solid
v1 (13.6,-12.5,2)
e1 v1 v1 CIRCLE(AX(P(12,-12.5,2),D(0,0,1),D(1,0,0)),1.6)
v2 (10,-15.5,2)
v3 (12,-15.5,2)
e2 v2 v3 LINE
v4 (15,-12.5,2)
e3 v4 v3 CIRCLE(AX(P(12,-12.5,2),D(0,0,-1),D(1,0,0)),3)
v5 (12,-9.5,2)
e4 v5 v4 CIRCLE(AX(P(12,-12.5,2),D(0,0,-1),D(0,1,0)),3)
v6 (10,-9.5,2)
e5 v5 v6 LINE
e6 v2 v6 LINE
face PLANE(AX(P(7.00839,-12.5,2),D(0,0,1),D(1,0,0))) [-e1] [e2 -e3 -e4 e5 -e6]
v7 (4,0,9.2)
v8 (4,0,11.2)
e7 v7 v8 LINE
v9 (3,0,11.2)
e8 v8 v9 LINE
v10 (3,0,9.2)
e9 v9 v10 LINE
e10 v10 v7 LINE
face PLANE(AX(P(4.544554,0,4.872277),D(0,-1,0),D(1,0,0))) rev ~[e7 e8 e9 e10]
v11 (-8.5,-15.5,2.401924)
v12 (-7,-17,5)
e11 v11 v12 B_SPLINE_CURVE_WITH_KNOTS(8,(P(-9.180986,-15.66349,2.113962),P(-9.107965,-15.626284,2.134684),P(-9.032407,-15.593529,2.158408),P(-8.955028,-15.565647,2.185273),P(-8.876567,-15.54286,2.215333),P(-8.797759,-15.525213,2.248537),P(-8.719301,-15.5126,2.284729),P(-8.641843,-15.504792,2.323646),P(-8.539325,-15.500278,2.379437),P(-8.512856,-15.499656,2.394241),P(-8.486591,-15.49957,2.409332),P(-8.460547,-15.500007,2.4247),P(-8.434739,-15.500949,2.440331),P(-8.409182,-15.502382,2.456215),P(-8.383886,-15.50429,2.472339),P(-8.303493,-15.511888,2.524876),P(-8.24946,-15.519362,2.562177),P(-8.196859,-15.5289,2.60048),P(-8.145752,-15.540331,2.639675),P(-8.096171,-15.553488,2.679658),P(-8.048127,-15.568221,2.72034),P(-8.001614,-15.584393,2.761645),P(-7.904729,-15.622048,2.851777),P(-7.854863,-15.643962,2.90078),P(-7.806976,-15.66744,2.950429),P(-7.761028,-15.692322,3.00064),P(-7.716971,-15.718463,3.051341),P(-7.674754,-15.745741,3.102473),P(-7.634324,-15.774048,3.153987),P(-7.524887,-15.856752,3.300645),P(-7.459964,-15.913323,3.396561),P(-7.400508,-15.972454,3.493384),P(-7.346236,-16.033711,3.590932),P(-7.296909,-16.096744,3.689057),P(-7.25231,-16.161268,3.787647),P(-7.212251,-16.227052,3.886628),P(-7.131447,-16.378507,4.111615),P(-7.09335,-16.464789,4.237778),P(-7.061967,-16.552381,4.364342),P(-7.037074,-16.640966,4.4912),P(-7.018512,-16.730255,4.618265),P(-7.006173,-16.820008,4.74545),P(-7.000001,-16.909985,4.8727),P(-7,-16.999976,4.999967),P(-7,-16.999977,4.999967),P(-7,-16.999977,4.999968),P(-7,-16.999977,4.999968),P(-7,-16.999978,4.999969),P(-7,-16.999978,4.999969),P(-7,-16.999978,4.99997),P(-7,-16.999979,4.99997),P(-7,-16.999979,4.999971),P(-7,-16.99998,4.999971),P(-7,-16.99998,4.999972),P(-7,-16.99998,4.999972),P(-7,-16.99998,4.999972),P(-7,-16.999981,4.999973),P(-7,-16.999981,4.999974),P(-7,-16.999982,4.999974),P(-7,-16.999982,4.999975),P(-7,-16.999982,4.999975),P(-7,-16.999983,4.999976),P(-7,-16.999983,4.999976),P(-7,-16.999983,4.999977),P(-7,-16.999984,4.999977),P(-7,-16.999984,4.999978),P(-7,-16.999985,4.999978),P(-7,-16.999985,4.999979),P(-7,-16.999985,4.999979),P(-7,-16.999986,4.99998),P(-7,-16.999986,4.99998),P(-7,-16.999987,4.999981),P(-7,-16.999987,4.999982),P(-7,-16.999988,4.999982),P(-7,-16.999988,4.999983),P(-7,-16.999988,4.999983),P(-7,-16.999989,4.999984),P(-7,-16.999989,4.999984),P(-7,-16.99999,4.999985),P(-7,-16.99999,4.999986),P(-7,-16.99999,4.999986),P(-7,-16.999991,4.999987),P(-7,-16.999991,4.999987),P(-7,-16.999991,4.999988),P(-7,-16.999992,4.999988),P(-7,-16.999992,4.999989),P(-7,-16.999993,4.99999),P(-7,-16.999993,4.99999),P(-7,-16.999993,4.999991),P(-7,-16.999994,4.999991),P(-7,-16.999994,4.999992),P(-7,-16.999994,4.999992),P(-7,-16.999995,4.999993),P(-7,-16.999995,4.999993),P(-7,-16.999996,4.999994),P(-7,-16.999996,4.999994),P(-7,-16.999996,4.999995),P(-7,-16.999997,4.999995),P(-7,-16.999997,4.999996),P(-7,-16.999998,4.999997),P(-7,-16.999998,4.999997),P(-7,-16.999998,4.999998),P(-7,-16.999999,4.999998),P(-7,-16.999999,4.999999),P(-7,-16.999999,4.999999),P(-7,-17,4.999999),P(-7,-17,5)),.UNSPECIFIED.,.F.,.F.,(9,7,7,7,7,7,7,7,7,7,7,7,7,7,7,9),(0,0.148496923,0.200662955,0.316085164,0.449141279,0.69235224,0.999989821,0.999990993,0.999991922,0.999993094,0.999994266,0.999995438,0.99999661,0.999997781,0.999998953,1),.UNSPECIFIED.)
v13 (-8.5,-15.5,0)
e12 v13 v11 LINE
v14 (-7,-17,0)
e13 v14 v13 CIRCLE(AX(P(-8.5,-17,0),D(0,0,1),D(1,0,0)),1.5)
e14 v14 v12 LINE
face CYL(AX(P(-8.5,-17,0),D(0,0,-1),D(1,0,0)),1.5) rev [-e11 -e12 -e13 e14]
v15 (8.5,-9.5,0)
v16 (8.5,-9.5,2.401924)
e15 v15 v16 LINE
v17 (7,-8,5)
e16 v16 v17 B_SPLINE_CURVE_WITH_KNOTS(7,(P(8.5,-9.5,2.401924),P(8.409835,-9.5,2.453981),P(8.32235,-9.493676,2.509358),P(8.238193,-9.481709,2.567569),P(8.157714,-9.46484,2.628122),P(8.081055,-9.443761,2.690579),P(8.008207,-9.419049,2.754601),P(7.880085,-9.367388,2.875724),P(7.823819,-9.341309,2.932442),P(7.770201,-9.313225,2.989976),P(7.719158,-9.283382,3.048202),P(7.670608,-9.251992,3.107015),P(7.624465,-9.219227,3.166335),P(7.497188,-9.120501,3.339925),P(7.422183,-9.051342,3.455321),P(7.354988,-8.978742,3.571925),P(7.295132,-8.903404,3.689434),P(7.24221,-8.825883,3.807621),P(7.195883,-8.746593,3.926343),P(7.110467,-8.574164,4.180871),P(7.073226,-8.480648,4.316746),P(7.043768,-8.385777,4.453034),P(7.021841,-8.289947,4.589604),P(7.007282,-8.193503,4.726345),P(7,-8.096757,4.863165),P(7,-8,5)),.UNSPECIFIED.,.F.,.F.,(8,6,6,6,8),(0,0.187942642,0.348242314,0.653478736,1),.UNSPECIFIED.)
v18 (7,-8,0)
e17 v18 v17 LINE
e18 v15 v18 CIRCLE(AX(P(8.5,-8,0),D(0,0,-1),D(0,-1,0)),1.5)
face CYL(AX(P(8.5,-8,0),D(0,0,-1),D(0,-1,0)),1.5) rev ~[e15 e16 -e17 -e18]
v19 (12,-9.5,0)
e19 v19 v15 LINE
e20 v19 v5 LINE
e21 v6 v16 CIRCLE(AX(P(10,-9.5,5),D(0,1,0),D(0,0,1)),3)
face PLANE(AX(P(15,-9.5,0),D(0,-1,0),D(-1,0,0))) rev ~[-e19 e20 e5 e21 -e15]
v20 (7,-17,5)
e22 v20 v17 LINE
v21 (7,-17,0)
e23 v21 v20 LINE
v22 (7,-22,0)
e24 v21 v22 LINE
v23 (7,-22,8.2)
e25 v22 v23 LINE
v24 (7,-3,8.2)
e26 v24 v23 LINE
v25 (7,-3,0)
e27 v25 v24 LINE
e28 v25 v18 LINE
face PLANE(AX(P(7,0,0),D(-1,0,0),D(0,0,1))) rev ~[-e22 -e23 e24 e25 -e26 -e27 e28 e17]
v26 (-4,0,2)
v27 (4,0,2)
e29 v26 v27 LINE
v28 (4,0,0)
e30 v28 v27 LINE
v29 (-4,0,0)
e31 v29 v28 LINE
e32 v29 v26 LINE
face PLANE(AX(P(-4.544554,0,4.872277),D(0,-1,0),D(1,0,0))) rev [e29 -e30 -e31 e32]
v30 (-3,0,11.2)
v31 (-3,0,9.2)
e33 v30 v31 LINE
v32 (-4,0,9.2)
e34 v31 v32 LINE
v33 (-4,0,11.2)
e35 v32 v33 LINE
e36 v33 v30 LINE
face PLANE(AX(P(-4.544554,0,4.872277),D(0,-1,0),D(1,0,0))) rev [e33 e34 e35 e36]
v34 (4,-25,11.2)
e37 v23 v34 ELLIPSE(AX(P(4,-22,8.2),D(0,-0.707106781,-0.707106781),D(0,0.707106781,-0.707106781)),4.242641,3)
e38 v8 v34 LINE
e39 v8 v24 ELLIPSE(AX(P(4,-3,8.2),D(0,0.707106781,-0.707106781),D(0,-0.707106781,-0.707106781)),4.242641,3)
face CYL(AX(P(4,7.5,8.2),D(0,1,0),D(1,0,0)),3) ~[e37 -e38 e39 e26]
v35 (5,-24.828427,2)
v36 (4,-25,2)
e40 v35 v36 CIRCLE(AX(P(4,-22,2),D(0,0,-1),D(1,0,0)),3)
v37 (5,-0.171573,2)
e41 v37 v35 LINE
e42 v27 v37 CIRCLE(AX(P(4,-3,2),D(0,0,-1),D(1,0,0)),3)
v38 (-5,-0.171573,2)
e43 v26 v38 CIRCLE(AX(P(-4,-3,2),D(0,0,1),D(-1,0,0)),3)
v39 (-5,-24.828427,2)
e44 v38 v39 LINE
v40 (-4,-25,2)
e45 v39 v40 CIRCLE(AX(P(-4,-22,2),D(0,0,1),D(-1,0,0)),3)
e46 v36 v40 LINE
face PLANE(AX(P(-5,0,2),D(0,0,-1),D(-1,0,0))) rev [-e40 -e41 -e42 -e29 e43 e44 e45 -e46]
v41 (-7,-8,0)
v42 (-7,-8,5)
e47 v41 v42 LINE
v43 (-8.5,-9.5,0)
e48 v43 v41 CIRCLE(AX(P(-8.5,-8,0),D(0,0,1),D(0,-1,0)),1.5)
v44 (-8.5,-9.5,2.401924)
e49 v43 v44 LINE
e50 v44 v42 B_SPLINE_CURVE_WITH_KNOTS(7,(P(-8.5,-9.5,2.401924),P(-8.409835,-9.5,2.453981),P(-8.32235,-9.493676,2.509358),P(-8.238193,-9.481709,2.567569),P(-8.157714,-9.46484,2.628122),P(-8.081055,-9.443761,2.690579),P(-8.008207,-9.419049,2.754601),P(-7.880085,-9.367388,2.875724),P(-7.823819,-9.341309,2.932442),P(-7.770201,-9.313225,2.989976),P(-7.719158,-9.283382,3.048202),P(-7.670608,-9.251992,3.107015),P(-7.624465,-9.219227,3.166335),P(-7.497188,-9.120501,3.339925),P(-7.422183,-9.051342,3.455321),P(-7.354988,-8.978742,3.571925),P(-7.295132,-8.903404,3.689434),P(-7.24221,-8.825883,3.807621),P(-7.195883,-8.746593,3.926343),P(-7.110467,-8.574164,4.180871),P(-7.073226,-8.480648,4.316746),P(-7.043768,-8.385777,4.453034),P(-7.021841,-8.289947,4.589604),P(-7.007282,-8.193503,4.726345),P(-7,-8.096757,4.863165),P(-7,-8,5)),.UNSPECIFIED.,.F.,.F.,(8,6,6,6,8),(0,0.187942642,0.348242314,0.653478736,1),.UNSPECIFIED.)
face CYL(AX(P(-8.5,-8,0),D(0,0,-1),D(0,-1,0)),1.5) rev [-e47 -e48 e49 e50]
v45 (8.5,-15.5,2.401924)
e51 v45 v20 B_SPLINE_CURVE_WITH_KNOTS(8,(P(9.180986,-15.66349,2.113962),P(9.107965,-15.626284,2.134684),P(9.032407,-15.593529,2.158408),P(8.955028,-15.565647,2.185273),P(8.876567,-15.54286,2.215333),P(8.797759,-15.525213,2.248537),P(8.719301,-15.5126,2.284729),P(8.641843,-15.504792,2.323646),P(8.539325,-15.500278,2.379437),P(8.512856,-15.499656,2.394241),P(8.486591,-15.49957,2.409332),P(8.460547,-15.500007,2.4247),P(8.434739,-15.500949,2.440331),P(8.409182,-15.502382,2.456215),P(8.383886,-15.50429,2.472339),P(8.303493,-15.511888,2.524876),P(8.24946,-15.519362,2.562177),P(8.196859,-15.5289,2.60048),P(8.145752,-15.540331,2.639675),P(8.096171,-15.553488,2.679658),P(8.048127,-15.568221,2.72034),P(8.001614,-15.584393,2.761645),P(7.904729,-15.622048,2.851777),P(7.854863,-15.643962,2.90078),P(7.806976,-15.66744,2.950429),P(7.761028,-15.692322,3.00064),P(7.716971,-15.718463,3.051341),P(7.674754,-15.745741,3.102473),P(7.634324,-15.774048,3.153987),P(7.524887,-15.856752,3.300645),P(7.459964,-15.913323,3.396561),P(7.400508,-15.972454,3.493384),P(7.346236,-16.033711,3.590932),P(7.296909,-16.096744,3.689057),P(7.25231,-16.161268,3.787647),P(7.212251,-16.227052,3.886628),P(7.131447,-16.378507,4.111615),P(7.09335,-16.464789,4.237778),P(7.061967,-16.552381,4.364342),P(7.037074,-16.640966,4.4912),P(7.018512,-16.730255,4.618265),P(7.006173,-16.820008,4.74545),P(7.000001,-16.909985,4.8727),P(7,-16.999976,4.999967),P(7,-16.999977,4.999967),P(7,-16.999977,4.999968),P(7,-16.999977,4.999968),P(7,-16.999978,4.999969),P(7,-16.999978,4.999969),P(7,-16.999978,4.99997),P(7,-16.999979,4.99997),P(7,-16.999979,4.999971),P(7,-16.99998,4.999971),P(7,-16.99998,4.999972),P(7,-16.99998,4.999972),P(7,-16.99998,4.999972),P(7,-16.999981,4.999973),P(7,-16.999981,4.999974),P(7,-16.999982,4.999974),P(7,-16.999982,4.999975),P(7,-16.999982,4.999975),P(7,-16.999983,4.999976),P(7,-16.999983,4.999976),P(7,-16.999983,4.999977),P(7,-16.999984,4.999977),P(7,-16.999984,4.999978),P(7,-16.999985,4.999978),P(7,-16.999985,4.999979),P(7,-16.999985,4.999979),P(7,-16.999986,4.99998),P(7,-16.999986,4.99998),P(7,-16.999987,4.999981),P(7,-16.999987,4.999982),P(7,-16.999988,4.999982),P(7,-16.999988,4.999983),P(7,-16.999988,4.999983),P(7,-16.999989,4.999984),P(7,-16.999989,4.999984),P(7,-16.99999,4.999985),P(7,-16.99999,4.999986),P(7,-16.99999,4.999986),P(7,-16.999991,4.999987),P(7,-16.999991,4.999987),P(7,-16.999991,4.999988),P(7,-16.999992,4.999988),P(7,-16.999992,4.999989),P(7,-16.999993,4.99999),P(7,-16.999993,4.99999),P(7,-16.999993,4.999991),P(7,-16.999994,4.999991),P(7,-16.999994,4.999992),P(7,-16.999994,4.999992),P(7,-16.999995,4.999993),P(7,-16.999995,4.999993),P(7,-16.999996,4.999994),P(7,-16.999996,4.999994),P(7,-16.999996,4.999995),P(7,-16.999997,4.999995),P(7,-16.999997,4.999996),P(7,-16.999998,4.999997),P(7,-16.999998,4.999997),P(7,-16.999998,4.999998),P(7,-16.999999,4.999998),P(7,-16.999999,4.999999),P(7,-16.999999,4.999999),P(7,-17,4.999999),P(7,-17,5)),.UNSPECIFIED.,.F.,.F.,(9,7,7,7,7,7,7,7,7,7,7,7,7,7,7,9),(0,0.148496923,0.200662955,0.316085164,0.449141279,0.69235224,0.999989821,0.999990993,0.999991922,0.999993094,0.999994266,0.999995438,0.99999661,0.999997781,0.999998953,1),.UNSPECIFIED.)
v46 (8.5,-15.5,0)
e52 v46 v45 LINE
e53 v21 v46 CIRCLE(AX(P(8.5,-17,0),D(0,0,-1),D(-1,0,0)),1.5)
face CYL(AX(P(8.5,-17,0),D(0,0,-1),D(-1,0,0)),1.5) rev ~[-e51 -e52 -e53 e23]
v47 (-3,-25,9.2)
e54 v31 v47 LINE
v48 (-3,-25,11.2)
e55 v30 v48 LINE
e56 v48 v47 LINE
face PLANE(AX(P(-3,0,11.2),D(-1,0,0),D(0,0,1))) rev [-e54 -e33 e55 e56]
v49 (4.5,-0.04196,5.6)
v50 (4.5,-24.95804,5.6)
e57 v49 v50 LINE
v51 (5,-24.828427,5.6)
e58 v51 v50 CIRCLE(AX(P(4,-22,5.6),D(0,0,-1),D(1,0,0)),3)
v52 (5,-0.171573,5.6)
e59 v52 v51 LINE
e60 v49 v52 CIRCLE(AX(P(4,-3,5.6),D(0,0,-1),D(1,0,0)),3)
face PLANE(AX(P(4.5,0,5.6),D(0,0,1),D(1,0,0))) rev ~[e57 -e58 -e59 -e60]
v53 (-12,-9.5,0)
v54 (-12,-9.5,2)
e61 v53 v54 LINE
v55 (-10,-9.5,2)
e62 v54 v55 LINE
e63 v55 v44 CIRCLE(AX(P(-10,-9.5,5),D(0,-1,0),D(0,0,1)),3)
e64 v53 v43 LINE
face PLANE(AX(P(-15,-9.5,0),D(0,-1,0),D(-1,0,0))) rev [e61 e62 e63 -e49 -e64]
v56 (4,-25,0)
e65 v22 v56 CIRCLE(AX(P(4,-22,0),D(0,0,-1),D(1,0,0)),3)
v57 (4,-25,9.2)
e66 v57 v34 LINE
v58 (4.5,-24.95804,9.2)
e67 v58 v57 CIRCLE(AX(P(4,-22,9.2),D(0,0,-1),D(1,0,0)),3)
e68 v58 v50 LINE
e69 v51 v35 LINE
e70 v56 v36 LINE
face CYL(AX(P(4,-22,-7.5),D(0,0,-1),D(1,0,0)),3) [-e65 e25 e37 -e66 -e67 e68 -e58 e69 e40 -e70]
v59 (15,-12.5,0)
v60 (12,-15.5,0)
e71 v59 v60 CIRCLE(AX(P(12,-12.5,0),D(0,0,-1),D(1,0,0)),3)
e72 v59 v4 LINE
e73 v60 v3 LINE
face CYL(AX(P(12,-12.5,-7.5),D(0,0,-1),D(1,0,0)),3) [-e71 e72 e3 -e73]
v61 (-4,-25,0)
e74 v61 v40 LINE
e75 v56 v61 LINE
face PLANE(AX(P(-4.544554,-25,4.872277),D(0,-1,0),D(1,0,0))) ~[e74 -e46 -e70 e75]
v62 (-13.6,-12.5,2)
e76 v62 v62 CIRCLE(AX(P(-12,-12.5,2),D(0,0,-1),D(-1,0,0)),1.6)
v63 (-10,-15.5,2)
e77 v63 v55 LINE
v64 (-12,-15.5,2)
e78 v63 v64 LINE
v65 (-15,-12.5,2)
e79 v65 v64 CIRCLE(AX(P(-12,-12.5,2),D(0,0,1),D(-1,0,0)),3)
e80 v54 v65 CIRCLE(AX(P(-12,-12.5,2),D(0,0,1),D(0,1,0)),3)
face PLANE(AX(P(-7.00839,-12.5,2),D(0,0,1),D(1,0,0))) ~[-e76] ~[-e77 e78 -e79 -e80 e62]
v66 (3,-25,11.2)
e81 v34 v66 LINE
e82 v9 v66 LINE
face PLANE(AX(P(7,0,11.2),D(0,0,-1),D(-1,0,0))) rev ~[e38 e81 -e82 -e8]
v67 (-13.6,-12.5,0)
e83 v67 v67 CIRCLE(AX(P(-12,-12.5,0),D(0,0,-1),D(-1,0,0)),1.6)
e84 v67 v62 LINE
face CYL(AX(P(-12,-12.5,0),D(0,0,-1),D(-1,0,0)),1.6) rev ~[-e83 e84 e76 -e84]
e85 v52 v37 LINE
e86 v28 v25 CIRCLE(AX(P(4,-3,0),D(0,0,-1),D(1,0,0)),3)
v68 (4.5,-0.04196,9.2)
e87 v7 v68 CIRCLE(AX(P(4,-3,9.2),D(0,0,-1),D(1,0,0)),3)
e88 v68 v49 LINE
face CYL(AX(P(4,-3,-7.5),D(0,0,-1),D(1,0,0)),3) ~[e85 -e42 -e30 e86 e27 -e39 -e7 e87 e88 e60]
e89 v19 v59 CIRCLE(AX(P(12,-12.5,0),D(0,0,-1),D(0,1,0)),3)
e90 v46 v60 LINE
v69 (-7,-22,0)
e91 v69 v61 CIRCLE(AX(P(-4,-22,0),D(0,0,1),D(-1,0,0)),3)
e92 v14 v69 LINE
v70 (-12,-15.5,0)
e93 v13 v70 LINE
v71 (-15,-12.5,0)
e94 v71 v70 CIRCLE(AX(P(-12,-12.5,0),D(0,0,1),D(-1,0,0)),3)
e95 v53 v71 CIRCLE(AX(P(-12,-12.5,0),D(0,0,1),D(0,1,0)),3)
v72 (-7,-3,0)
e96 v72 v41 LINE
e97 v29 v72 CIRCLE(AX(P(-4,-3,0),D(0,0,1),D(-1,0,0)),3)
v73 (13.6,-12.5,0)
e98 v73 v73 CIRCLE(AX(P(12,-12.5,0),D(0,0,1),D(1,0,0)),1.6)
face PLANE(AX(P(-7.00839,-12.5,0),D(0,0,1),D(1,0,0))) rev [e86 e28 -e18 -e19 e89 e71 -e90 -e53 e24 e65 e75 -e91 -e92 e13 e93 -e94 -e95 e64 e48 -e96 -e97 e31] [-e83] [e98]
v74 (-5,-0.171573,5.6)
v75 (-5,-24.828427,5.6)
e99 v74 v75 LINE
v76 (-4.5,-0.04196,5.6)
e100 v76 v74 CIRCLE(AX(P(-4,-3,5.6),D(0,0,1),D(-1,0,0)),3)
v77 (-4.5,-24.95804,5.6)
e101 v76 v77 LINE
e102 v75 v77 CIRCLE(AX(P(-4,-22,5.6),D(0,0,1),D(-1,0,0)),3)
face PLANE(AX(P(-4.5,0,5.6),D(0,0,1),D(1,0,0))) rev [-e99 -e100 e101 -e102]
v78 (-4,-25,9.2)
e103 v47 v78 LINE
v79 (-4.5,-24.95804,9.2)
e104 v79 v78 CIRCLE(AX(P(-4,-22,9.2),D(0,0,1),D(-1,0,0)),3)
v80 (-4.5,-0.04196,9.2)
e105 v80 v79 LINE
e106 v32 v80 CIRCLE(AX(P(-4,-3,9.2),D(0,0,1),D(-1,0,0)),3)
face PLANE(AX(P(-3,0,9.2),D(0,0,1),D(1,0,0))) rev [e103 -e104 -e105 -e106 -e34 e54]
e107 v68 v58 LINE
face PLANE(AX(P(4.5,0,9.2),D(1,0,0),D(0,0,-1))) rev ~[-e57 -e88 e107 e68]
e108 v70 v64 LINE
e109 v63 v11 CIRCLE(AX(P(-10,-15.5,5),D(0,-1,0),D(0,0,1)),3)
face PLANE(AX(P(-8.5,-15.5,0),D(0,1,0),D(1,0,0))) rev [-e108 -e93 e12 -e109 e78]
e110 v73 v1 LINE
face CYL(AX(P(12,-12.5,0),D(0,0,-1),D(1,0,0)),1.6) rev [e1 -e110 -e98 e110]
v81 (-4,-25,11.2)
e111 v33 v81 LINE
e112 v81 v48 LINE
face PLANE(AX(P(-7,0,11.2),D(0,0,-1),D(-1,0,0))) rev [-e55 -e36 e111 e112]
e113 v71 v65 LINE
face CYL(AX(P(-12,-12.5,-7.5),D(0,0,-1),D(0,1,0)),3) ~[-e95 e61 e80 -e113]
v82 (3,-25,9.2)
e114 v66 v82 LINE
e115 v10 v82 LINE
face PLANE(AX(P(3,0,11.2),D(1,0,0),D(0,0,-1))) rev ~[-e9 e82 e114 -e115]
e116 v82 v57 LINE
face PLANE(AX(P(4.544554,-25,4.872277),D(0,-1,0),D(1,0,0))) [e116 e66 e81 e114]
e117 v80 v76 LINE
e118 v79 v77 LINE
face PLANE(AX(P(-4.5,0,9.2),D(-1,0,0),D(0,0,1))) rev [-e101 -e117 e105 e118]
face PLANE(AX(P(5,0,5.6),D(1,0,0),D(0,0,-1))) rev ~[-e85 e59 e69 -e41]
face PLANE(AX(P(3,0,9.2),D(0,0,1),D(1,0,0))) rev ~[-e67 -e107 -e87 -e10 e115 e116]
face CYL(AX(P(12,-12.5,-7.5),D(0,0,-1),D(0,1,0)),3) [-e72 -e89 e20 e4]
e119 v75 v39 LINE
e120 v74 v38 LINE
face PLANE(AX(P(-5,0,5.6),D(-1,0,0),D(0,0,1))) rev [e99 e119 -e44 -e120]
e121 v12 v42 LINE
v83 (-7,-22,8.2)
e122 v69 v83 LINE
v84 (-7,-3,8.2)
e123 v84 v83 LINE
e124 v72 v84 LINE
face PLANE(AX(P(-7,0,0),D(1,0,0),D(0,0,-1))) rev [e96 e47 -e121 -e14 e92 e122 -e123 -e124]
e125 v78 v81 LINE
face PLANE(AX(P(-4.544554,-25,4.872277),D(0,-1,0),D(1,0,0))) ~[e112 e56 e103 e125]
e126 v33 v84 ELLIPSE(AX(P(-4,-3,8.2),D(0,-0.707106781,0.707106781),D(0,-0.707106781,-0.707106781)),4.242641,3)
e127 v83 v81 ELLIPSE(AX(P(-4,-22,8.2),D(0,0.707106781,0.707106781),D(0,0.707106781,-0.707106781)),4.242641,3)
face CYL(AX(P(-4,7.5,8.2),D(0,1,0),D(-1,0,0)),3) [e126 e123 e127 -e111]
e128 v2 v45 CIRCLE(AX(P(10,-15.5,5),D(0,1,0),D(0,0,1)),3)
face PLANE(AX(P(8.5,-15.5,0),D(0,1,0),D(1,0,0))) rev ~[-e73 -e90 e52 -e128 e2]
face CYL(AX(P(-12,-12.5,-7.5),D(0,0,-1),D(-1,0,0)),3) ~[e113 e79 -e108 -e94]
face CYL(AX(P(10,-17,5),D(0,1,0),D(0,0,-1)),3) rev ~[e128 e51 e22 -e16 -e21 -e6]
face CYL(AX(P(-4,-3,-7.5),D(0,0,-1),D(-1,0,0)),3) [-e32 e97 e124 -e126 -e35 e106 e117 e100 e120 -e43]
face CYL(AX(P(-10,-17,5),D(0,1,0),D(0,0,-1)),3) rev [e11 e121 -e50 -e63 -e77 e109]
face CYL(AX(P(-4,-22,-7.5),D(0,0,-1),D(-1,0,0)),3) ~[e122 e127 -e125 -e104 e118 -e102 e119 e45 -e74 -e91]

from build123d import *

# Parameters (mm, degrees)
F1_DEPTH    = 25
F2_R        = 1.6
F3_DEPTH    = 2
F4_F1_R     = 3
F4_T2_DEPTH = 17
F4_T4_DEPTH = 26.2
F4_T6_DEPTH = 40


# Not quite as in the source:
# - a fillet or chamfer that OpenCascade refuses, or shapes differently, is made with other operations: its cross-section is extruded or revolved along the edge and cut away or added


with BuildPart() as f1:
    # F0 (on Front) → F1 (new body)
    with BuildSketch(Plane.XZ):
        Polygon((0, 2), (0, 0), (7, 0), (7, 11.2), (3, 11.2), (3, 9.2), (4.5, 9.2), (4.5, 5.6), (5, 5.6), (5, 2), align=None)
    extrude(amount=F1_DEPTH)

    # F2 (on Top) → F3 (join)
    with BuildSketch(Plane.XY):
        with BuildLine():
            Line((15, -9.5), (8.5, -9.5))
            ThreePointArc((8.5, -9.5), (7.4393398282, -9.0606601718), (7, -8))
            Line((7, -8), (0, -8))
            Line((0, -8), (0, -9.5))
            Line((0, -9.5), (0, -15.5))
            Line((0, -15.5), (0, -17))
            Line((0, -17), (7, -17))
            ThreePointArc((7, -17), (7.4393398282, -15.9393398282), (8.5, -15.5))
            Line((8.5, -15.5), (15, -15.5))
            Line((15, -15.5), (15, -9.5))
        make_face()
        with Locations((12, -12.5)):
            Circle(F2_R, mode=Mode.SUBTRACT)
    extrude(amount=F3_DEPTH)

    # F4: fillet of radius 3 on 6 edges, made by hand

    # F4_f1
    f4_f1_edges = [f1.edges().sort_by_distance(p)[0] for p in [
        (7, -12.5, 2),
    ]]
    fillet(f4_f1_edges, radius=F4_F1_R)

    # F4_s3 → F4_t2 (cut)
    with BuildSketch(Plane.XY.offset(-7.5)):
        with BuildLine():
            ThreePointArc((15, -12.5), (14.1213203436, -14.6213203436), (12, -15.5))
            Line((12, -15.5), (12, -15.56))
            Line((12, -15.56), (15.06, -15.56))
            Line((15.06, -15.56), (15.06, -12.5))
            Line((15.06, -12.5), (15, -12.5))
        make_face()
        with BuildLine():
            ThreePointArc((12, -9.5), (14.1213203436, -10.3786796564), (15, -12.5))
            Line((15, -12.5), (15.06, -12.5))
            Line((15.06, -12.5), (15.06, -9.44))
            Line((15.06, -9.44), (12, -9.44))
            Line((12, -9.44), (12, -9.5))
        make_face()
    extrude(amount=F4_T2_DEPTH, mode=Mode.SUBTRACT)

    # F4_s5 → F4_t4 (cut)
    with BuildSketch(Plane.XY.offset(-7.5)):
        with BuildLine():
            ThreePointArc((7, -22), (6.1213203436, -24.1213203436), (4, -25))
            Line((4, -25), (4, -25.06))
            Line((4, -25.06), (7.06, -25.06))
            Line((7.06, -25.06), (7.06, -22))
            Line((7.06, -22), (7, -22))
        make_face()
        with BuildLine():
            ThreePointArc((7, -3), (6.1213203436, -0.8786796564), (4, 0))
            Line((4, 0), (4, 0.06))
            Line((4, 0.06), (7.06, 0.06))
            Line((7.06, 0.06), (7.06, -3))
            Line((7.06, -3), (7, -3))
        make_face()
    extrude(amount=F4_T4_DEPTH, mode=Mode.SUBTRACT)

    # F4_s7 → F4_t6 (cut)
    with BuildSketch(Plane.XZ.offset(-7.5)):
        with BuildLine():
            ThreePointArc((7, 8.2), (6.1213203436, 10.3213203436), (4, 11.2))
            Line((4, 11.2), (4, 11.26))
            Line((4, 11.26), (7.06, 11.26))
            Line((7.06, 11.26), (7.06, 8.2))
            Line((7.06, 8.2), (7, 8.2))
        make_face()
    extrude(amount=F4_T6_DEPTH, mode=Mode.SUBTRACT)

    # F5: F1 across face


with BuildPart() as f1_1:
    add(f1.part)
    add(f1.part.mirror(Plane(origin=(0, -12.5, 1), x_dir=(0, -1, 0), z_dir=(-1, 0, 0))))


solid = f1_1.part
